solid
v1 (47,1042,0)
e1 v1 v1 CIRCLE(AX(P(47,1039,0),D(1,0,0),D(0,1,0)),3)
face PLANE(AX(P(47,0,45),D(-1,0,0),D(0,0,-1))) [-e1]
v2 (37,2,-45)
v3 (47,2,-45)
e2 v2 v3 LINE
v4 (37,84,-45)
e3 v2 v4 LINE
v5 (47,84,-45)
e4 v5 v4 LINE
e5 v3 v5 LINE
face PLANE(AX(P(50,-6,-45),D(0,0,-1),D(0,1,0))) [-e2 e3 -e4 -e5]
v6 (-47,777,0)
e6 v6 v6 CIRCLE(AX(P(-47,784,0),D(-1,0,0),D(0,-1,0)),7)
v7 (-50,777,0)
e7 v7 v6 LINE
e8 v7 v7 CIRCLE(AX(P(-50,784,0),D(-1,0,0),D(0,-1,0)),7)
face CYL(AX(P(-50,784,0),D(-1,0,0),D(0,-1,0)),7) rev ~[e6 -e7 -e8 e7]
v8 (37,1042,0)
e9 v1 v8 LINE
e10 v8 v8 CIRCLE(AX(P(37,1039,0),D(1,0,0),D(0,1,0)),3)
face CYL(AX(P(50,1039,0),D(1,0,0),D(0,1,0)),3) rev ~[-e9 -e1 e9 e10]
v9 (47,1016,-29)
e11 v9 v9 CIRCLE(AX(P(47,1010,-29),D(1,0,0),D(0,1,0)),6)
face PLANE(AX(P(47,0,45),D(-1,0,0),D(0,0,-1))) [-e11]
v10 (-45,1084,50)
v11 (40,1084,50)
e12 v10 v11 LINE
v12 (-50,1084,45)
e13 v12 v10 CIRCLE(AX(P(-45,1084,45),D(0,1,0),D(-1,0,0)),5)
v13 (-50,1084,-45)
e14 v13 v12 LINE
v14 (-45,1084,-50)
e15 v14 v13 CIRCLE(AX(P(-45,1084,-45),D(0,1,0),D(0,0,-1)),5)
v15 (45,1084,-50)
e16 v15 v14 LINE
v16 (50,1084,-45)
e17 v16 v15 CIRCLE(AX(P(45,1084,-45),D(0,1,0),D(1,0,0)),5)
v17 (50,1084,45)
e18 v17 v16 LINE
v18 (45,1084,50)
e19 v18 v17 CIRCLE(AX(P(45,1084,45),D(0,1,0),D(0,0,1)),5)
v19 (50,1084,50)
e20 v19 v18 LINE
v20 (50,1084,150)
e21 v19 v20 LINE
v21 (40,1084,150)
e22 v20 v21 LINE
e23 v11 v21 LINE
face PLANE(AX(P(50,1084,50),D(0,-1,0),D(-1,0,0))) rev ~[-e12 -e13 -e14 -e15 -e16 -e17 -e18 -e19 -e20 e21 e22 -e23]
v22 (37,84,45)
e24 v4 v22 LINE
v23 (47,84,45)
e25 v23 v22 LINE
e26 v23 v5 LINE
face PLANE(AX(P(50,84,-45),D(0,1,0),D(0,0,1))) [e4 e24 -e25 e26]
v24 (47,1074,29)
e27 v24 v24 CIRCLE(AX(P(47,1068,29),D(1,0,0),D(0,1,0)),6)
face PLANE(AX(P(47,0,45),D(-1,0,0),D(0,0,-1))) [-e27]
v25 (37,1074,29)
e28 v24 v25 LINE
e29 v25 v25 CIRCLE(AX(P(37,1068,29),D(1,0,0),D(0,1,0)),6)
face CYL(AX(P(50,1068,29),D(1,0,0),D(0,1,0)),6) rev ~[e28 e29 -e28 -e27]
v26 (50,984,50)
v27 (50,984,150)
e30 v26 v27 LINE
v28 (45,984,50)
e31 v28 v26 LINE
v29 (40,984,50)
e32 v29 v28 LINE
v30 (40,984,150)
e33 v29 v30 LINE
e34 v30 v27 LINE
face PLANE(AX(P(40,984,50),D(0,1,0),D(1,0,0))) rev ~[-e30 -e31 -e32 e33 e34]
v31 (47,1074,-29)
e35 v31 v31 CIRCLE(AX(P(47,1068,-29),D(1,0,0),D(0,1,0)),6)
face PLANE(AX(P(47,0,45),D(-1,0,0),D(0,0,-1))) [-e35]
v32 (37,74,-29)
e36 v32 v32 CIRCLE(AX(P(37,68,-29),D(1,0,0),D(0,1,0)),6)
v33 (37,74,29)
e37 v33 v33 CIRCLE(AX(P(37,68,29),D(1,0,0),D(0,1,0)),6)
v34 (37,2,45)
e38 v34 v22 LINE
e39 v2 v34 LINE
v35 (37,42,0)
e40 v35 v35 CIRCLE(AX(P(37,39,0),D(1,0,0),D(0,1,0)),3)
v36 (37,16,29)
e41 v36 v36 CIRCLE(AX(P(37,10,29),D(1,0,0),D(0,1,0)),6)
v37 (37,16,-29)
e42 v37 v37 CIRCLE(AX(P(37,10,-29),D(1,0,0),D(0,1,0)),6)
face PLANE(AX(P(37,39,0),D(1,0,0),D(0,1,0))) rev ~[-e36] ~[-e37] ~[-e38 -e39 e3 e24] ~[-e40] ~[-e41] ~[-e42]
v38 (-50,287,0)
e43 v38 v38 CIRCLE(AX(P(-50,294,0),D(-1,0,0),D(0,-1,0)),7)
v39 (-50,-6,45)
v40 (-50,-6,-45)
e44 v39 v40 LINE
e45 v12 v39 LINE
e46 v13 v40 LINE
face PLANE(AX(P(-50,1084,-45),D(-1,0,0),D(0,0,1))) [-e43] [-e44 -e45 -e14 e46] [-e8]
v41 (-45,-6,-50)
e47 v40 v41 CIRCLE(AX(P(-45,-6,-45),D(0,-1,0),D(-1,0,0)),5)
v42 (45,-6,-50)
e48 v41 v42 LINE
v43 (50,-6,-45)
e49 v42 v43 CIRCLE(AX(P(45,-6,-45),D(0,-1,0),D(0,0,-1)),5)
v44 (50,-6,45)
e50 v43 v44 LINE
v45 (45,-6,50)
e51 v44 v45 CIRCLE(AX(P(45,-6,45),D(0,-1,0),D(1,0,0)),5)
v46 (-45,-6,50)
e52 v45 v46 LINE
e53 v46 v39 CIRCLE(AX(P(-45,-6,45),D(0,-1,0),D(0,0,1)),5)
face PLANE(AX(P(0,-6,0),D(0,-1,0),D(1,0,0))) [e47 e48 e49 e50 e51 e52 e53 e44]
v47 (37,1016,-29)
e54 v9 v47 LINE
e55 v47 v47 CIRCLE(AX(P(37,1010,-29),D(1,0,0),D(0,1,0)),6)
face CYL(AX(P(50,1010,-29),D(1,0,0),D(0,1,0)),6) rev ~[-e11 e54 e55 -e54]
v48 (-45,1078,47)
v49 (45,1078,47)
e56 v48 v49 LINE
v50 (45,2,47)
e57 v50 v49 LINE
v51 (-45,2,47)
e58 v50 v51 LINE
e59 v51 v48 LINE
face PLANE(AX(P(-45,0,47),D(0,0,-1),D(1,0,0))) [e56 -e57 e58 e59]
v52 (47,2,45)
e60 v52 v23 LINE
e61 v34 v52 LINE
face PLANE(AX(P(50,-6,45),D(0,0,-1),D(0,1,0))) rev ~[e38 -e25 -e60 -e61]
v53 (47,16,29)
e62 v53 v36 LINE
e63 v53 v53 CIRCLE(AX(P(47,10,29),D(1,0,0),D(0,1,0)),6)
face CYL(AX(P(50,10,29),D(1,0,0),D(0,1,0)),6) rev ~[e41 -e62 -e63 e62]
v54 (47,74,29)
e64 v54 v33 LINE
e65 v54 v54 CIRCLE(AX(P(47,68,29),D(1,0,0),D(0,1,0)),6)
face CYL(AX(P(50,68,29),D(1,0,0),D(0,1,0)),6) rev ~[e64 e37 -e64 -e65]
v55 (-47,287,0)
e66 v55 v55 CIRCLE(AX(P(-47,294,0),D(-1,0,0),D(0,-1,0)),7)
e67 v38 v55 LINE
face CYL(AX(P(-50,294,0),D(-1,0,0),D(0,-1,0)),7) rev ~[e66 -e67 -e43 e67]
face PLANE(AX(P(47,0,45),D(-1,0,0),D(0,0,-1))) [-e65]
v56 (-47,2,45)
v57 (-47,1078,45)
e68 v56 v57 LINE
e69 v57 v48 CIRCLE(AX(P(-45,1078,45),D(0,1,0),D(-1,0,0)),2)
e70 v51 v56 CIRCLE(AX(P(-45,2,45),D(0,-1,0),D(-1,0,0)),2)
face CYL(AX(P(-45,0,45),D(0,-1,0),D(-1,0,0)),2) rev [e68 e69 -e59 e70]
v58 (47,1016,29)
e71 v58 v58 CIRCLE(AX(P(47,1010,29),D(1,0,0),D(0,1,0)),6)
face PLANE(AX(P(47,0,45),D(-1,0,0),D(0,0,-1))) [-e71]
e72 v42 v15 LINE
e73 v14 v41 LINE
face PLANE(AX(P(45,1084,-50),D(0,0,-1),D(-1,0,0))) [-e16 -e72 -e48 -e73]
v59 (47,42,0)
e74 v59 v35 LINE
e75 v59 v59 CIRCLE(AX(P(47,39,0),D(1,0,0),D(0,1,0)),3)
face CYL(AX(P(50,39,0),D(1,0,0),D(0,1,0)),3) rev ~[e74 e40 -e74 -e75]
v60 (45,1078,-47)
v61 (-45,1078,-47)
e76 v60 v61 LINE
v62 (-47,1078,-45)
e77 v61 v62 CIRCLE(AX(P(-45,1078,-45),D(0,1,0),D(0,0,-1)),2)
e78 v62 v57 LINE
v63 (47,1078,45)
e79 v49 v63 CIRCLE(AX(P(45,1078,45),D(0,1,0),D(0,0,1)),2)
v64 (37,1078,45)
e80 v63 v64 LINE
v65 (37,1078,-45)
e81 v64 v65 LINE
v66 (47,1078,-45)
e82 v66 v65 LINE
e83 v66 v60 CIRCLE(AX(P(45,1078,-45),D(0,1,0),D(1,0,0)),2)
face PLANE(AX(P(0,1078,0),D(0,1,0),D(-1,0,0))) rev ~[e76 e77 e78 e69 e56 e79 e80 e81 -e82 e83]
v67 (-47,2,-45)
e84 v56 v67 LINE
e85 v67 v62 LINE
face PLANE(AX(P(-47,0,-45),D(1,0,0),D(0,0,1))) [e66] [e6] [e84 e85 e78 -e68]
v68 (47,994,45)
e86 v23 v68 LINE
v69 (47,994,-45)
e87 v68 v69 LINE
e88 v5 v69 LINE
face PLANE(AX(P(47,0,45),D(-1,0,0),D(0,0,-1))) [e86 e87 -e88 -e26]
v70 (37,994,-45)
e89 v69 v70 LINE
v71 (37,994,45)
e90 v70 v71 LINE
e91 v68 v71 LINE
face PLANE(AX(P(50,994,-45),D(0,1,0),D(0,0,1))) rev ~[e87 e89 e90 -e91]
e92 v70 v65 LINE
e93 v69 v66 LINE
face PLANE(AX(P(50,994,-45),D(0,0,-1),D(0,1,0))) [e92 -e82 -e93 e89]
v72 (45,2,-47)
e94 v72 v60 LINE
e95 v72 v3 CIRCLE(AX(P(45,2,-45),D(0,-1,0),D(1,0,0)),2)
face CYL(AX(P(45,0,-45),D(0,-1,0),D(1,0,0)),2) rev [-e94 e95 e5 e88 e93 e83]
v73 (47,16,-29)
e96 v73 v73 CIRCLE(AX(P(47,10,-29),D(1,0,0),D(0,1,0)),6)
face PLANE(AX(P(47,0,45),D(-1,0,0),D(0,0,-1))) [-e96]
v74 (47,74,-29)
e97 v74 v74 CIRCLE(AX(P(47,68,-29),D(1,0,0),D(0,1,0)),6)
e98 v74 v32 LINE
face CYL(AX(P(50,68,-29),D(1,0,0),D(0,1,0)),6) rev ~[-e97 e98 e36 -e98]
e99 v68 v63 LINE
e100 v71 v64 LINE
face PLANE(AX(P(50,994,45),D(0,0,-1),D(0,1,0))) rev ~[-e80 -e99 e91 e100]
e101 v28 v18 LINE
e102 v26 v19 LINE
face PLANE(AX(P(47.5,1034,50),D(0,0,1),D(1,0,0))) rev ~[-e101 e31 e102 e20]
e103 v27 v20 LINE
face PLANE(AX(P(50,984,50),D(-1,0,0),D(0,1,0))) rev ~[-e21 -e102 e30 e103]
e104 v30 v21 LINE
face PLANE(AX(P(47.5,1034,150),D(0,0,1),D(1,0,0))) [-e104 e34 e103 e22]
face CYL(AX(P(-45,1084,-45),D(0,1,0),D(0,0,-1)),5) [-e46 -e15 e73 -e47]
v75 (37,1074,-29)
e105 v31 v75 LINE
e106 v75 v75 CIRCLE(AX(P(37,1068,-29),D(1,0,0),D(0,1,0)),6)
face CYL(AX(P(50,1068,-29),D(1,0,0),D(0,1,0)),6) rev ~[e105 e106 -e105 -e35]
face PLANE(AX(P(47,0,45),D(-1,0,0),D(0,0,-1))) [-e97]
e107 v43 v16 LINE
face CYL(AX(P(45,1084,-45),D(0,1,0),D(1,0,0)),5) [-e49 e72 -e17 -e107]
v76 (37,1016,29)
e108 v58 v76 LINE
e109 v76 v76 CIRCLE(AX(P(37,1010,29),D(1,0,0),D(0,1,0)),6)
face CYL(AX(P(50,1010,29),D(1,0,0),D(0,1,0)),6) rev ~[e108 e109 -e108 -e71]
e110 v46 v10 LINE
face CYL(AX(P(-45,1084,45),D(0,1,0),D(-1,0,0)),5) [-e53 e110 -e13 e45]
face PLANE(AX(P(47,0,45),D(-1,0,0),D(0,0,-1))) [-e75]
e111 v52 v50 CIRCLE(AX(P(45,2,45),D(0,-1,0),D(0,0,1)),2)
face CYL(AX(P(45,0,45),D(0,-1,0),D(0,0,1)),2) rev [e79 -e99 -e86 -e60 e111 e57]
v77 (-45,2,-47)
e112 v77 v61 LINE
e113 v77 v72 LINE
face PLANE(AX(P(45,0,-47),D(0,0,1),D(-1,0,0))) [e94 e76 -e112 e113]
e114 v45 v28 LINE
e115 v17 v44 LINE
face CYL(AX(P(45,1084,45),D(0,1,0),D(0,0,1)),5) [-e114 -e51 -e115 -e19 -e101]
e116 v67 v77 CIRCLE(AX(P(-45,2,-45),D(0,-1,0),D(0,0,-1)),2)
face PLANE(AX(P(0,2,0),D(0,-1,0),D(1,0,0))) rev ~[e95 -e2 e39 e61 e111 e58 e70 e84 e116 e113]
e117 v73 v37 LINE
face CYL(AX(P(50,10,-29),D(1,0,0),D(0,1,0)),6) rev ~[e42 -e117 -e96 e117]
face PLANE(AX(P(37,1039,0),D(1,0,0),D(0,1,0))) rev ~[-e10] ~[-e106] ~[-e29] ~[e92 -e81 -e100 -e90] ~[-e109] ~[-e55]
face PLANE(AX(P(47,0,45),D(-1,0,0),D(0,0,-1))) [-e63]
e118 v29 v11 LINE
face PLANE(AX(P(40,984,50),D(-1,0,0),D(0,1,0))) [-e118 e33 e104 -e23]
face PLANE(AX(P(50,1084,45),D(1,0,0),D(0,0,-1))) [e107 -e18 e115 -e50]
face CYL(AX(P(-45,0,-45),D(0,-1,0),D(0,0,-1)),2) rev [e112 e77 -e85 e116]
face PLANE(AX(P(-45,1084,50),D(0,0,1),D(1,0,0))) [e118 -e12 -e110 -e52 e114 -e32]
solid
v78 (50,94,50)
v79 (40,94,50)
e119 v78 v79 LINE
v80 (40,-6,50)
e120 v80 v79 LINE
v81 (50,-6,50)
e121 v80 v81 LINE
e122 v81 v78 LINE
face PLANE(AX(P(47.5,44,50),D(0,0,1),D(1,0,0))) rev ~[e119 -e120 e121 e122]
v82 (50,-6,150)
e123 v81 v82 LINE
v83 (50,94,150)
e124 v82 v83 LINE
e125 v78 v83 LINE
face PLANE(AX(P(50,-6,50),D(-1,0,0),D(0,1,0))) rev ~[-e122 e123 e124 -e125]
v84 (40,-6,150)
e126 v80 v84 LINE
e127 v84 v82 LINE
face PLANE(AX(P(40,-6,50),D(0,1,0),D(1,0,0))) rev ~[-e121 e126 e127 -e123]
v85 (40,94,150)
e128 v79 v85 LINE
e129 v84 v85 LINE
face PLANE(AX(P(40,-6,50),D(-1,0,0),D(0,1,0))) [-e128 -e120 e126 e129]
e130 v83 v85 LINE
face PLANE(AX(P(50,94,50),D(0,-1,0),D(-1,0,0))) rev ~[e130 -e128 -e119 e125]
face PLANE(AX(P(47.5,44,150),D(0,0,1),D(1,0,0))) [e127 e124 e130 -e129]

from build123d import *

# Parameters (mm, degrees)
F1_DEPTH  = 1078
F4_DEPTH  = 8
F7_DEPTH  = 6
F9_R      = 7
F10_DEPTH = 3
F11_W     = 90
F11_H     = 90
F11_R     = 6
F11_R_2   = 3
F12_DEPTH = 13
F13_W     = 5
F13_H     = 100
F14_DEPTH = 100


with BuildPart() as f1:
    # F0 (on Front) → F1 (new body)
    with BuildSketch(Plane.XZ):
        with BuildLine():
            ThreePointArc((50, 45), (48.5355339059, 48.5355339059), (45, 50))
            Line((45, 50), (-45, 50))
            ThreePointArc((-45, 50), (-48.5355339059, 48.5355339059), (-50, 45))
            Line((-50, 45), (-50, -45))
            ThreePointArc((-50, -45), (-48.5355339059, -48.5355339059), (-45, -50))
            Line((-45, -50), (45, -50))
            ThreePointArc((45, -50), (48.5355339059, -48.5355339059), (50, -45))
            Line((50, -45), (50, 45))
        make_face()
        with BuildLine():
            ThreePointArc((-47, 45), (-46.4142135624, 46.4142135624), (-45, 47))
            Line((-45, 47), (45, 47))
            ThreePointArc((45, 47), (46.4142135624, 46.4142135624), (47, 45))
            Line((47, 45), (47, -45))
            ThreePointArc((47, -45), (46.4142135624, -46.4142135624), (45, -47))
            Line((45, -47), (-45, -47))
            ThreePointArc((-45, -47), (-46.4142135624, -46.4142135624), (-47, -45))
            Line((-47, -45), (-47, 45))
        make_face(mode=Mode.SUBTRACT)
    extrude(amount=-F1_DEPTH)

    # F3 (on offset) → F4 (join)
    with BuildSketch(Plane.XZ.offset(6)):
        with BuildLine():
            ThreePointArc((50, 45), (48.5355339059, 48.5355339059), (45, 50))
            Line((45, 50), (-45, 50))
            ThreePointArc((-45, 50), (-48.5355339059, 48.5355339059), (-50, 45))
            Line((-50, 45), (-50, -45))
            ThreePointArc((-50, -45), (-48.5355339059, -48.5355339059), (-45, -50))
            Line((-45, -50), (45, -50))
            ThreePointArc((45, -50), (48.5355339059, -48.5355339059), (50, -45))
            Line((50, -45), (50, 45))
        make_face()
    extrude(amount=-F4_DEPTH)

    # F6 (on offset) → F7 (join)
    with BuildSketch(Plane(origin=(0, 1084, 0), x_dir=(-1, 0, 0), z_dir=(0, 1, 0))):
        with BuildLine():
            ThreePointArc((50, 45), (48.5355339059, 48.5355339059), (45, 50))
            Line((45, 50), (-45, 50))
            ThreePointArc((-45, 50), (-48.5355339059, 48.5355339059), (-50, 45))
            Line((-50, 45), (-50, -45))
            ThreePointArc((-50, -45), (-48.5355339059, -48.5355339059), (-45, -50))
            Line((-45, -50), (45, -50))
            ThreePointArc((45, -50), (48.5355339059, -48.5355339059), (50, -45))
            Line((50, -45), (50, 45))
        make_face()
    extrude(amount=-F7_DEPTH)

    # F8: union 

    # F9 (on face) → F10 (cut, through all)
    with BuildSketch(Plane(origin=(-50, 0, 0), x_dir=(0, -1, 0), z_dir=(-1, 0, 0))):
        with Locations((-784, 0)):
            Circle(F9_R)
        with Locations((-294, 0)):
            Circle(F9_R)
    extrude(amount=-F10_DEPTH, mode=Mode.SUBTRACT)

    # F11 (on face) → F12 (join)
    with BuildSketch(Plane.YZ.offset(50)):
        with Locations((1039, 0)):
            Rectangle(F11_W, F11_H)
        with Locations((1010, -29)):
            Circle(F11_R, mode=Mode.SUBTRACT)
        with Locations((1068, -29)):
            Circle(F11_R, mode=Mode.SUBTRACT)
        with Locations((1039, 0)):
            Circle(F11_R_2, mode=Mode.SUBTRACT)
        with Locations((1010, 29)):
            Circle(F11_R, mode=Mode.SUBTRACT)
        with Locations((1068, 29)):
            Circle(F11_R, mode=Mode.SUBTRACT)
        with Locations((39, 0)):
            Rectangle(F11_W, F11_H)
        with Locations((10, -29)):
            Circle(F11_R, mode=Mode.SUBTRACT)
        with Locations((68, -29)):
            Circle(F11_R, mode=Mode.SUBTRACT)
        with Locations((39, 0)):
            Circle(F11_R_2, mode=Mode.SUBTRACT)
        with Locations((10, 29)):
            Circle(F11_R, mode=Mode.SUBTRACT)
        with Locations((68, 29)):
            Circle(F11_R, mode=Mode.SUBTRACT)
    extrude(amount=-F12_DEPTH)

    # F13 (on face) → F14 (join)
    with BuildSketch(Plane.XY.offset(50)):
        with Locations((47.5, 1034)):
            Rectangle(F13_W, F13_H)
        with Locations((42.5, 1034)):
            Rectangle(F13_W, F13_H)
    extrude(amount=F14_DEPTH)


with BuildPart() as f14:
    # F13 (on face) → F14, piece 2 (new body)
    with BuildSketch(Plane.XY.offset(50)):
        with Locations((47.5, 44)):
            Rectangle(F13_W, F13_H)
        with Locations((42.5, 44)):
            Rectangle(F13_W, F13_H)
    extrude(amount=F14_DEPTH)


solid = Compound([f1.part, f14.part])
